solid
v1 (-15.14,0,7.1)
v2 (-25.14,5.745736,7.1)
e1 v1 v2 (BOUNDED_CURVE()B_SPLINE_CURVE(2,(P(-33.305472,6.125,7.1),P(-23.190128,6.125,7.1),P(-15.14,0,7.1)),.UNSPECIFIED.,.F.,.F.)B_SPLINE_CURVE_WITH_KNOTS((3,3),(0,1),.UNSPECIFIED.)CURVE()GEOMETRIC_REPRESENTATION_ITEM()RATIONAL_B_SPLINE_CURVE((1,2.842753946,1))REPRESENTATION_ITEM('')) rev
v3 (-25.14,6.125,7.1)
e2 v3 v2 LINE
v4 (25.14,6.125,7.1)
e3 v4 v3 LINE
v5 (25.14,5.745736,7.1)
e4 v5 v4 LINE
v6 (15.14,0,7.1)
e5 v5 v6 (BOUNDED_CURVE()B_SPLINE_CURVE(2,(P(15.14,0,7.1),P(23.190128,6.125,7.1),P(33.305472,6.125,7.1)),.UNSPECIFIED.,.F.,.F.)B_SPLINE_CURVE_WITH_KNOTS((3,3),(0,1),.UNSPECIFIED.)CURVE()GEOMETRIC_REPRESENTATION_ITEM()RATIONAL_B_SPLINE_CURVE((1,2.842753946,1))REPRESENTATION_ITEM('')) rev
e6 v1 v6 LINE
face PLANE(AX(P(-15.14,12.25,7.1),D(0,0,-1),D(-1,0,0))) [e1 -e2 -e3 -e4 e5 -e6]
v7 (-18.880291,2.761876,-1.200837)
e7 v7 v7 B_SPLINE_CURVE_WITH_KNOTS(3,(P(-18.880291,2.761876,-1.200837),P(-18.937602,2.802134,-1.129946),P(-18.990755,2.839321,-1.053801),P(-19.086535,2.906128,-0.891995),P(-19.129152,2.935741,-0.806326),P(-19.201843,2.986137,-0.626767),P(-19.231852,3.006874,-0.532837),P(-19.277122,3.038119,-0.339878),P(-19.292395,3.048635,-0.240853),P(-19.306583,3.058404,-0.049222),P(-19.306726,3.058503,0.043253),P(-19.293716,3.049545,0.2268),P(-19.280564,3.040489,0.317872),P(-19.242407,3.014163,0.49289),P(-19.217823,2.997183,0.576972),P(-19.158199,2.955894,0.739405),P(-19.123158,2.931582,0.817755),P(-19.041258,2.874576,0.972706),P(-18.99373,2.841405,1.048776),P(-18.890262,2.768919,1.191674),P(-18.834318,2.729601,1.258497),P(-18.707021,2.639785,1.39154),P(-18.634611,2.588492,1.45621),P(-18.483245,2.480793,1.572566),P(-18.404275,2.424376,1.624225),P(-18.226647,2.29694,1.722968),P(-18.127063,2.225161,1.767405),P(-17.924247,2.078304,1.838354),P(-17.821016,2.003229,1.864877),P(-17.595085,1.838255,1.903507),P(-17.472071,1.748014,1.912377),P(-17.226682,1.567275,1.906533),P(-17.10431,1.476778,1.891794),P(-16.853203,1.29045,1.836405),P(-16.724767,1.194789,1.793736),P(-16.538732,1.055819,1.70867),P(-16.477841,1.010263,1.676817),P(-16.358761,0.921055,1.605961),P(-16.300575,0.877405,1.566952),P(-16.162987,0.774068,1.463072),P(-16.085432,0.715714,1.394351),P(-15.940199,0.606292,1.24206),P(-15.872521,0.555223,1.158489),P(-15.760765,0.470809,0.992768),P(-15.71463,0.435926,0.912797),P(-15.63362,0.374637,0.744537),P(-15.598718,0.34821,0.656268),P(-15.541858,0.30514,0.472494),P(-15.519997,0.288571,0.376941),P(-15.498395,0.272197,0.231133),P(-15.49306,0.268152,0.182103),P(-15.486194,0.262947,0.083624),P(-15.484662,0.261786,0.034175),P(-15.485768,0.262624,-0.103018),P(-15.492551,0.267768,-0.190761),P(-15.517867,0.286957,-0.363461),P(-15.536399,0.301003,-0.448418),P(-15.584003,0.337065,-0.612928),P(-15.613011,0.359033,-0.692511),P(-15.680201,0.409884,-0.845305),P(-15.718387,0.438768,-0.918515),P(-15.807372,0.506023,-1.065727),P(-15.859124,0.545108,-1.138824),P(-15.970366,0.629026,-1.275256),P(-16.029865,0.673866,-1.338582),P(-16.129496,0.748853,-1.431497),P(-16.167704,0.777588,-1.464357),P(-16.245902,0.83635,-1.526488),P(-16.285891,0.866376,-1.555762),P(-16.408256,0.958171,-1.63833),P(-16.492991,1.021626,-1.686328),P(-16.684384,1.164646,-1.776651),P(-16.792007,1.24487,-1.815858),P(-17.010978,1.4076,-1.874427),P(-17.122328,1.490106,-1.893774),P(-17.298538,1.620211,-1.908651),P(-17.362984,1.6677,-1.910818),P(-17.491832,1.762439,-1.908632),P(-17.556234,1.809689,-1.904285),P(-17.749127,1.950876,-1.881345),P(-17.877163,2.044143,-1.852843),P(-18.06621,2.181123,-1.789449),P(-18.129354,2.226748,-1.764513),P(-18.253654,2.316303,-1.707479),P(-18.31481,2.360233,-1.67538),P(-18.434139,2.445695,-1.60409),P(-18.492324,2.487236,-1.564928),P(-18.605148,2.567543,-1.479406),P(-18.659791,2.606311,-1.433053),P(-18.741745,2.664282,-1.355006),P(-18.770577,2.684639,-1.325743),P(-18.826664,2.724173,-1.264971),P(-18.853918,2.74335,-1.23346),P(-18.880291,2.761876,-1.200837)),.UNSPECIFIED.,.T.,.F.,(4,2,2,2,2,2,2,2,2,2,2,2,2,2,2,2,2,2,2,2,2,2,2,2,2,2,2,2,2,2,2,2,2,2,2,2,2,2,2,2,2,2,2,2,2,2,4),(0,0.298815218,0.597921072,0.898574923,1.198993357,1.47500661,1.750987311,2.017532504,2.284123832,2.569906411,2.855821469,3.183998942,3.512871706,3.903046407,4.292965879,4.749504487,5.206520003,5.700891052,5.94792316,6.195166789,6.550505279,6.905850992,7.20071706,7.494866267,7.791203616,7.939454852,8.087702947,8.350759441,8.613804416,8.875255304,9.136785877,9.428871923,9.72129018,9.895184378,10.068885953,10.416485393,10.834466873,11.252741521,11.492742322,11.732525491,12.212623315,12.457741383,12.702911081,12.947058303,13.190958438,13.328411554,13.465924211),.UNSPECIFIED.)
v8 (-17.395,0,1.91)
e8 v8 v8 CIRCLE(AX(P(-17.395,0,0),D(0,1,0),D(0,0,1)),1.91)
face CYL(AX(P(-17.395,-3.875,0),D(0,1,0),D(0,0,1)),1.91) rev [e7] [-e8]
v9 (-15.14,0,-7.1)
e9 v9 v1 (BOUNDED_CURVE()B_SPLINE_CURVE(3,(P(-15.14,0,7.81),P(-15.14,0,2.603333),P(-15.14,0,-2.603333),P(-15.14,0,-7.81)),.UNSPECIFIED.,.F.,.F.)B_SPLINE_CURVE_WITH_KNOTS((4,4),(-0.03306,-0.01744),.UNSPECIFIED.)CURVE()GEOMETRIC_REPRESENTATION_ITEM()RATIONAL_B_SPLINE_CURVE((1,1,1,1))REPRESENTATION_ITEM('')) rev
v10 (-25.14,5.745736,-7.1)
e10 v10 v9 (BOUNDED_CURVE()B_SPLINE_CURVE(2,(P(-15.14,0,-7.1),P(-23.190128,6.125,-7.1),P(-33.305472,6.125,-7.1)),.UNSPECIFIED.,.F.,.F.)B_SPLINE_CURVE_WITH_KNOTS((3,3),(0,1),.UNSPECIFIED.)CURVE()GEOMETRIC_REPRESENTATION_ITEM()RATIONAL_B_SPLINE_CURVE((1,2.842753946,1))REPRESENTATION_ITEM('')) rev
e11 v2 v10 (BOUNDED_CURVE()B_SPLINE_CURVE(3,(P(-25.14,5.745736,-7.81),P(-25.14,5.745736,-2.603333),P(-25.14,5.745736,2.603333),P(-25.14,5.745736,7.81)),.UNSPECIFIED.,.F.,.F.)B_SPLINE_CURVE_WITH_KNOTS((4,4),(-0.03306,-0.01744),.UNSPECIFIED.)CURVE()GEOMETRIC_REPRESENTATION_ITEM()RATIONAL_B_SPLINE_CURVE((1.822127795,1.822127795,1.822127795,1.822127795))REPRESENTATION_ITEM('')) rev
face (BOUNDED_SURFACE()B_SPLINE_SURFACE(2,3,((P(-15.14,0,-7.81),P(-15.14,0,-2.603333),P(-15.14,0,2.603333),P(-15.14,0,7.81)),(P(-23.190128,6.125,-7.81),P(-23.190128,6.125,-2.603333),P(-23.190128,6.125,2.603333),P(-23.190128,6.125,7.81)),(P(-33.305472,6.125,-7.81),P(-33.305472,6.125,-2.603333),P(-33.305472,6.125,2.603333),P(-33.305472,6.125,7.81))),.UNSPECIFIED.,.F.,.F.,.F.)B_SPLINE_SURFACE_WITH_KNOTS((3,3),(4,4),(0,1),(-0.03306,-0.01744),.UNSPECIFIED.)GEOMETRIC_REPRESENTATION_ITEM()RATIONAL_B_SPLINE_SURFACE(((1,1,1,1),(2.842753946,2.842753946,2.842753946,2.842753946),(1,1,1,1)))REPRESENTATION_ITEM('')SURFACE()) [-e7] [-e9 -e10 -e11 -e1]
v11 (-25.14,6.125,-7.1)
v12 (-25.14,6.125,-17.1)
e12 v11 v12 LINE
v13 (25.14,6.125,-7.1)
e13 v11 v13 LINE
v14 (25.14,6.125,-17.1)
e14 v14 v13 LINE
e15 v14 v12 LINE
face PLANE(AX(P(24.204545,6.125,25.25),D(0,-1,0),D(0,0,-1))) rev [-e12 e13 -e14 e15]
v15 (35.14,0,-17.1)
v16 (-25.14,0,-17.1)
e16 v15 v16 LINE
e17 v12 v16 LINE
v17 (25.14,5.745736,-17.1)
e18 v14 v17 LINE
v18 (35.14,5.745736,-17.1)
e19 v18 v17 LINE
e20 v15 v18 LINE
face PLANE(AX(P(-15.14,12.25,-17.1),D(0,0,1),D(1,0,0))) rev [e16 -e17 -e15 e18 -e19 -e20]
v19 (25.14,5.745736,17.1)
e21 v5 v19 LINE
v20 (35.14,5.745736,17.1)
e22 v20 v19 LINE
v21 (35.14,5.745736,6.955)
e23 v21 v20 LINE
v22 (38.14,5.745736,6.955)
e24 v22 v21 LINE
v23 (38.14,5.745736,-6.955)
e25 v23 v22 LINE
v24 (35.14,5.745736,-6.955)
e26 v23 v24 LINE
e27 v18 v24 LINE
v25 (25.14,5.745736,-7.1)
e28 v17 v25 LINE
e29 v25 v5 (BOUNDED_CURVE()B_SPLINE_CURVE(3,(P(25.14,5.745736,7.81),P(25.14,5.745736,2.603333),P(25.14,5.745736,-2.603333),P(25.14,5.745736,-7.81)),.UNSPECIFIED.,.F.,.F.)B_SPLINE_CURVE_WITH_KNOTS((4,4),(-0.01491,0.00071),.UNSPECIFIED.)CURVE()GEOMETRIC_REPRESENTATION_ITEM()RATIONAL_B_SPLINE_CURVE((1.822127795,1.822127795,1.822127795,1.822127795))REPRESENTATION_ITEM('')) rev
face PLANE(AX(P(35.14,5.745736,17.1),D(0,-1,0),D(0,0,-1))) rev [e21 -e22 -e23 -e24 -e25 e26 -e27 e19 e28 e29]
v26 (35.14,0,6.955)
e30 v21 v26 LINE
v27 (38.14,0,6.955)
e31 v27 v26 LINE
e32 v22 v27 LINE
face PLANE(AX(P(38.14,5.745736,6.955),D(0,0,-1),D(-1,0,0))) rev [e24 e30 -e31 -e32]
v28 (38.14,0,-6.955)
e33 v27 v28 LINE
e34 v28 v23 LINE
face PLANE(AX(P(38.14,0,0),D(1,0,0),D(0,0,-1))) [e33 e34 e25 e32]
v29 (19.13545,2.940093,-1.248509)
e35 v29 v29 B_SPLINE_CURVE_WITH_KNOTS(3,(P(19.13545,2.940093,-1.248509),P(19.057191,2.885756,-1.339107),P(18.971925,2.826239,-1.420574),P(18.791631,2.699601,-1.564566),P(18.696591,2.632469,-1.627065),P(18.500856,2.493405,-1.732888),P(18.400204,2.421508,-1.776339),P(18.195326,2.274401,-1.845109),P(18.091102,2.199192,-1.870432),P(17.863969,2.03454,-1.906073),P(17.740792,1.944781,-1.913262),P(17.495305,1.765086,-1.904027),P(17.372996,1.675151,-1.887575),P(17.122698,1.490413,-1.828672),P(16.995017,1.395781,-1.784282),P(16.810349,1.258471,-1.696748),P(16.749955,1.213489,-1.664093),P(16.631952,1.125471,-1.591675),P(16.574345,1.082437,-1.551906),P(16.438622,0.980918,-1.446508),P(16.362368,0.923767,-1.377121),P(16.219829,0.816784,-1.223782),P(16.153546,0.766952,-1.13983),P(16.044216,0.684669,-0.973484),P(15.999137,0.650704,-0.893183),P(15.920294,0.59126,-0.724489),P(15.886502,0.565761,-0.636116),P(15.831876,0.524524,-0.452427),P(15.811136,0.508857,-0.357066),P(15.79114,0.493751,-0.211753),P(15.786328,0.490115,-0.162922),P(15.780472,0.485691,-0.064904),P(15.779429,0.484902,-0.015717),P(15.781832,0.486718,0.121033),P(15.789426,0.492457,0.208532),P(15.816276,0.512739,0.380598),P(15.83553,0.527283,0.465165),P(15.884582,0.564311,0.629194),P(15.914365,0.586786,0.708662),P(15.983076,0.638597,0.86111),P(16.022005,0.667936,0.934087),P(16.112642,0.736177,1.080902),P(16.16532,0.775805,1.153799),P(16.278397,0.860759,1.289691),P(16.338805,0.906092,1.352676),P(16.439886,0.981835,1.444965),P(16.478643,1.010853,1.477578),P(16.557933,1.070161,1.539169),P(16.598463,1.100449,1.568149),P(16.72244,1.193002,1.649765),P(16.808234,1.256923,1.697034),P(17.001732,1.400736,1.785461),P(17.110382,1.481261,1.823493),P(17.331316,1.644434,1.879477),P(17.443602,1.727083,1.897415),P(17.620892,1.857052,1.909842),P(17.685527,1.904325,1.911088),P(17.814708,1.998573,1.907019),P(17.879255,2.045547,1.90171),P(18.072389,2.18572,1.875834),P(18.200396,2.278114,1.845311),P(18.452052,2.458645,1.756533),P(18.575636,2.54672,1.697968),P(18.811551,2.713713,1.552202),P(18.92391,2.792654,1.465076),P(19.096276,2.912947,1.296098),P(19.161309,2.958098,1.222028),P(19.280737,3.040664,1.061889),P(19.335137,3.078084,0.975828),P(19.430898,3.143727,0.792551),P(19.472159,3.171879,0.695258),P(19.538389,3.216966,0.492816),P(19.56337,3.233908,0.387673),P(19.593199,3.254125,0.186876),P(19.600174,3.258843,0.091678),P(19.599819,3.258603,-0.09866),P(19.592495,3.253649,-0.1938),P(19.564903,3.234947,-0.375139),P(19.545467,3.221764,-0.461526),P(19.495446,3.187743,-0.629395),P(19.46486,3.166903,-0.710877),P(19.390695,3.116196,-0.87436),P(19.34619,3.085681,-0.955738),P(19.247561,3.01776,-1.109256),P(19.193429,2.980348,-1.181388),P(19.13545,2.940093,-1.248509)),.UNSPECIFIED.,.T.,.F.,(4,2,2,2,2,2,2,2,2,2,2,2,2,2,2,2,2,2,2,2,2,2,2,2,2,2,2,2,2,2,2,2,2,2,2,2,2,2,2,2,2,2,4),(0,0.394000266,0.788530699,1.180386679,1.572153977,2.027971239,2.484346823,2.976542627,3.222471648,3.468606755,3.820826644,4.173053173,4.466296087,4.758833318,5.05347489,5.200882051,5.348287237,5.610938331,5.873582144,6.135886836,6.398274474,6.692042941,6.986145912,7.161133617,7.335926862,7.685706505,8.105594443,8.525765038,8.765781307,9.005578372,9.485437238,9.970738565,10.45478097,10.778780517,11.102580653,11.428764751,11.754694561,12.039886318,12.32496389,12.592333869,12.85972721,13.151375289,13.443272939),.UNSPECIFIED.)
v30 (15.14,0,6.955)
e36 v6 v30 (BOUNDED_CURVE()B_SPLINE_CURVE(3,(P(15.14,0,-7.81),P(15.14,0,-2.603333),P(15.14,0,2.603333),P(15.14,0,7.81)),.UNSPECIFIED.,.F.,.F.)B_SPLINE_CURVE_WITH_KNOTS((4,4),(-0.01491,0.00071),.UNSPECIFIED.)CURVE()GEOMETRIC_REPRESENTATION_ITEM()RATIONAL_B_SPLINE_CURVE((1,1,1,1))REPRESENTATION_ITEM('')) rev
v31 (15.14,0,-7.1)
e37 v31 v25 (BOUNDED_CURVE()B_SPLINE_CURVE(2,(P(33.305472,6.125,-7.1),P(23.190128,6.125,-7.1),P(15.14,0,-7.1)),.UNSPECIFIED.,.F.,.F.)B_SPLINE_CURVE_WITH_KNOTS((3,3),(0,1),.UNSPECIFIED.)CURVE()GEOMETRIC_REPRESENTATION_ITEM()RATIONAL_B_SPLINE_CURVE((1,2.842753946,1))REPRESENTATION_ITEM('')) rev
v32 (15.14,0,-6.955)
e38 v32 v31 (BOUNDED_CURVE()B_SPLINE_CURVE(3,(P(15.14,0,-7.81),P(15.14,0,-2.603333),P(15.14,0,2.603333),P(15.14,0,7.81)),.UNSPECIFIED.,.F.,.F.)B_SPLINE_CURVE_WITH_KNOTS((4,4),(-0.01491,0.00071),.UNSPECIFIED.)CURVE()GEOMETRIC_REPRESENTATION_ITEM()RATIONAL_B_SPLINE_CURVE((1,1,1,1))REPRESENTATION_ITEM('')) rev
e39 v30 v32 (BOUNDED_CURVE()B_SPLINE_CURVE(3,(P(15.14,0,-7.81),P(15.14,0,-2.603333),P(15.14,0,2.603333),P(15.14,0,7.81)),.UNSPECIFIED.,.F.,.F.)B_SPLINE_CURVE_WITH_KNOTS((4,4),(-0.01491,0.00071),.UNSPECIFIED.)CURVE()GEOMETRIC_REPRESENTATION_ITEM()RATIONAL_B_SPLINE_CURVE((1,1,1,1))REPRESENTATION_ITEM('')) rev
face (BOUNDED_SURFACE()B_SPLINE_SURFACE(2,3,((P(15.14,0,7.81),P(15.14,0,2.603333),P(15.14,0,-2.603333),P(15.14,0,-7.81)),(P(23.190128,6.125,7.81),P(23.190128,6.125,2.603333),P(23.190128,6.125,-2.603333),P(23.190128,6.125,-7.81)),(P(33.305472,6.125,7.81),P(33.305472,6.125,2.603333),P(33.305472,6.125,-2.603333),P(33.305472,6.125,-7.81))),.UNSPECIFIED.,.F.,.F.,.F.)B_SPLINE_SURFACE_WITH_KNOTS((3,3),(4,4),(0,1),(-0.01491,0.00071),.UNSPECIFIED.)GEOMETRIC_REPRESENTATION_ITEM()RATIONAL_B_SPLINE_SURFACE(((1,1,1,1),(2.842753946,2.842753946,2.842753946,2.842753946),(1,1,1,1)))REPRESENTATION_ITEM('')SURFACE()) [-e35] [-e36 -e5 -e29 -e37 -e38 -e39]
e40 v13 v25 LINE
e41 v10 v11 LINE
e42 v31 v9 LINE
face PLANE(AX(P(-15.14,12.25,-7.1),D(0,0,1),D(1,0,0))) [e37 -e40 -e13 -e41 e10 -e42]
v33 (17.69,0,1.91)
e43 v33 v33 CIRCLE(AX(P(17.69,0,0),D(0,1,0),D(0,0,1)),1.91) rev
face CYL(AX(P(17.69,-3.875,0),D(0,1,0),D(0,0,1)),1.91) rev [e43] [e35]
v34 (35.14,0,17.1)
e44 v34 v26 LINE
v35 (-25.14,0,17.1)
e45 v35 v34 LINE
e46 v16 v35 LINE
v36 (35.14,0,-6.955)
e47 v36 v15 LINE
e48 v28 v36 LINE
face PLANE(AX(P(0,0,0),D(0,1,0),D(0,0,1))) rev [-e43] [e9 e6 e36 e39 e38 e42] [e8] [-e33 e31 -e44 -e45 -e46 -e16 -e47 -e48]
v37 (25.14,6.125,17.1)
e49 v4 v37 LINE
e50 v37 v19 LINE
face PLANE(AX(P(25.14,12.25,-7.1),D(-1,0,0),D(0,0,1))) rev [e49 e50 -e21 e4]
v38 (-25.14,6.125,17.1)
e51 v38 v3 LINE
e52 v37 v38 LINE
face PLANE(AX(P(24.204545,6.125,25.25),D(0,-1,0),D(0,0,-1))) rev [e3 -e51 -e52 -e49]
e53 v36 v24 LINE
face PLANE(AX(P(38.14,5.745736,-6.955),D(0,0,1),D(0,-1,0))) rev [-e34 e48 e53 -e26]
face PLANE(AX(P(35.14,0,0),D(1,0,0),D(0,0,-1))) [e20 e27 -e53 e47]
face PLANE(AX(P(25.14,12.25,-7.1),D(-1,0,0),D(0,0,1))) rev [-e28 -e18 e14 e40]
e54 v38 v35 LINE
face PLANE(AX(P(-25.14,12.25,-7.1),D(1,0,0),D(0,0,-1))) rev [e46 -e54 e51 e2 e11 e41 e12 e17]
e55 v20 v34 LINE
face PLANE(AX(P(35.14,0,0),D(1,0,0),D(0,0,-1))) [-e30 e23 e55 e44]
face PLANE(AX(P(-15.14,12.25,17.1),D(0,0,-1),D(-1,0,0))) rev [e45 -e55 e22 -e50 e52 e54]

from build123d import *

# Parameters (mm, degrees)
SKETCH_1_W                = 50.28
SKETCH_1_H                = 34.2
SKETCH_1_W_2              = 30.28
SKETCH_1_H_2              = 14.2
EXTRUDE_1_DEPTH           = 12.25
SKETCH_4_W                = 13
SKETCH_4_H                = 13.91
EXTRUDE_1_2_DEPTH         = 74.82
SKETCH_5_W                = 13.91
SKETCH_5_H                = 16.23
EXTRUDE_2_DEPTH           = 16
SKETCH_7_R                = 25.25
SKETCH_7_R_2              = 15.25
EXTRUDE_2_2_DEPTH         = 16.23
SKETCH_15_R               = 1.91
CUT_EXTRUDE_6_DEPTH       = 97.964478439
SKETCH_16_W               = 13.91
SKETCH_16_H               = 16.23
EXTRUDE_4_DEPTH           = 10
SKETCH_17_R               = 1.91
CUT_EXTRUDE_7_DEPTH       = 102.16913771
SKETCH_18_W               = 49.344544624
SKETCH_18_H               = 6.125
CUT_EXTRUDE_8_DEPTH       = 105.840616652
SKETCH_19_W               = 34.2
SKETCH_19_H               = 6.125
CUT_EXTRUDE_9_DEPTH       = 10
SKETCH_21_R               = 1.91
CUT_EXTRUDE_10_DEPTH      = 10
SKETCH_20_R               = 1.91
CUT_EXTRUDE_11_DEPTH      = 10
FILLET_START              = -7.1
FILLET_1_DEPTH            = 14.2
FILLET_2_DEPTH            = 14.2
SKETCH_29_W               = 13.91
SKETCH_29_H               = 74.82
EXTRUDE_5_DEPTH           = 10
SKETCH_30_W               = 10
SKETCH_30_H               = 58.59
CUT_EXTRUDE_13_DEPTH      = 102.16913771
SKETCH_32_W               = 34.2
SKETCH_32_H               = 5.745736365
EXTRUDE_6_DEPTH           = 10
CUT_EXTRUDE_16_DEPTH      = 50
CUT_EXTRUDE_16_DEPTH_BACK = 50
SKETCH_38_W               = 116.985630298
SKETCH_38_H               = 80.538350638
SKETCH_41_W               = 13.91
SKETCH_41_H               = 5.745736365
EXTRUDE_7_DEPTH           = 3


with BuildPart() as part:
    # 草圖1 → Extrude 1 (new body)
    with BuildSketch(Plane(origin=(0, 0, 0), x_dir=(1, 0, 0), z_dir=(0, 1, 0))):
        Rectangle(SKETCH_1_W, SKETCH_1_H)
        Rectangle(SKETCH_1_W_2, SKETCH_1_H_2, mode=Mode.SUBTRACT)
    extrude(amount=EXTRUDE_1_DEPTH)

    # 草圖4 → Extrude 1 2 (add)
    with BuildSketch(Plane.XZ):
        with Locations((18.64, 0)):
            Rectangle(SKETCH_4_W, SKETCH_4_H)
    extrude(amount=EXTRUDE_1_2_DEPTH)

    # 草圖5 → Extrude 2 (add)
    with BuildSketch(Plane.ZY.offset(-12.14)):
        with Locations((0, -66.705)):
            Rectangle(SKETCH_5_W, SKETCH_5_H)
    extrude(amount=EXTRUDE_2_DEPTH)

    # 草圖7 → Extrude 2 2 (add)
    with BuildSketch(Plane(origin=(3.626674765, -74.82, 0), x_dir=(1, 0, 0), z_dir=(0, -1, 0))):
        with Locations((-30.978154344, 0)):
            Circle(SKETCH_7_R)
        with Locations((-30.978154344, 0)):
            Circle(SKETCH_7_R_2, mode=Mode.SUBTRACT)
    extrude(amount=-EXTRUDE_2_2_DEPTH)

    # 草圖15 → 除料-伸長6 (cut, through all)
    with BuildSketch(Plane(origin=(0, 0, -6.955), x_dir=(-1, 0, 0), z_dir=(0, 0, -1))):
        with Locations((-4.530883248, -66.705)):
            Circle(SKETCH_15_R)
    extrude(amount=-CUT_EXTRUDE_6_DEPTH, mode=Mode.SUBTRACT)

    # 草圖16 → 填料-伸長4 (add)
    with BuildSketch(Plane(origin=(-60, 0, 0), x_dir=(0, 0, -1), z_dir=(1, 0, 0))):
        with Locations((0, -66.705)):
            Rectangle(SKETCH_16_W, SKETCH_16_H)
    extrude(amount=EXTRUDE_4_DEPTH)

    # 草圖17 → 除料-伸長7 (cut, through all)
    with BuildSketch(Plane(origin=(0, 0, -6.955), x_dir=(-1, 0, 0), z_dir=(0, 0, -1))):
        with Locations((55.812362827, -66.705)):
            Circle(SKETCH_17_R)
    extrude(amount=-CUT_EXTRUDE_7_DEPTH, mode=Mode.SUBTRACT)

    # 草圖18 → 除料-伸長8 (cut, through all)
    with BuildSketch(Plane(origin=(0, 0, -17.1), x_dir=(-1, 0, 0), z_dir=(0, 0, -1))):
        with Locations((0.467727688, 9.1875)):
            Rectangle(SKETCH_18_W, SKETCH_18_H)
    extrude(amount=-CUT_EXTRUDE_8_DEPTH, mode=Mode.SUBTRACT)

    # 草圖19 → 除料-伸長9 (cut)
    with BuildSketch(Plane.ZY.offset(-24.204544624)):
        with Locations((0, 9.1875)):
            Rectangle(SKETCH_19_W, SKETCH_19_H)
    extrude(amount=-CUT_EXTRUDE_9_DEPTH, mode=Mode.SUBTRACT)

    # 草圖21 → 除料-伸長10 (cut)
    with BuildSketch(Plane(origin=(0, 6.125, 0), x_dir=(1, 0, 0), z_dir=(0, 1, 0))):
        with Locations(Location((17.69, 0, 0), (0, 0, 270))):
            Circle(SKETCH_21_R)
    extrude(amount=-CUT_EXTRUDE_10_DEPTH, mode=Mode.SUBTRACT)

    # 草圖20 → 除料-伸長11 (cut)
    with BuildSketch(Plane(origin=(0, 6.125, 0), x_dir=(1, 0, 0), z_dir=(0, 1, 0))):
        with Locations(Location((-17.395, 0, 0), (0, 0, 270))):
            Circle(SKETCH_20_R)
    extrude(amount=-CUT_EXTRUDE_11_DEPTH, mode=Mode.SUBTRACT)

    # 圓角1: read off the stored shape, not the designer's step
    # 圓角1 outline → 圓角1 (cut)
    with BuildSketch(Plane.XY.offset(FILLET_START)):
        with BuildLine():
            add(Edge.make_bspline(
                [(-15.14, 0), (-21.974170252, 5.199829476), (-25.14, 5.745736365)],
                knots=[0, 0, 0, 0.664102345, 0.664102345, 0.664102345], degree=2, weights=[1, 2.223777218, 1.822127795]))
            Line((-15.14, 0), (-15.14, 6.125))
            Line((-15.14, 6.125), (-25.14, 6.125))
            Line((-25.14, 6.125), (-25.14, 5.745736365))
        make_face()
    extrude(amount=FILLET_1_DEPTH, mode=Mode.SUBTRACT)

    # 圓角2: read off the stored shape, not the designer's step
    # 圓角2 outline → 圓角2 (cut)
    with BuildSketch(Plane.XY.offset(FILLET_START)):
        with BuildLine():
            Line((15.14, 6.125), (15.14, 0))
            add(Edge.make_bspline(
                [(15.14, 0), (21.974170252, 5.199829476), (25.14, 5.745736365)],
                knots=[0, 0, 0, 0.664102345, 0.664102345, 0.664102345], degree=2, weights=[1, 2.223777218, 1.822127795]))
            Line((25.14, 5.745736365), (25.14, 6.125))
            Line((25.14, 6.125), (15.14, 6.125))
        make_face()
    extrude(amount=FILLET_2_DEPTH, mode=Mode.SUBTRACT)

    # 草圖29 → 填料-伸長5 (add)
    with BuildSketch(Plane(origin=(25.14, 0, 0), x_dir=(0, 0, -1), z_dir=(1, 0, 0))):
        with Locations((0, -37.41)):
            Rectangle(SKETCH_29_W, SKETCH_29_H)
    extrude(amount=EXTRUDE_5_DEPTH)

    # 草圖30 → 除料-伸長13 (cut, through all)
    with BuildSketch(Plane.XY.offset(6.955)):
        with Locations((17.14, -29.295)):
            Rectangle(SKETCH_30_W, SKETCH_30_H)
    extrude(amount=-CUT_EXTRUDE_13_DEPTH, mode=Mode.SUBTRACT)

    # 草圖32 → 填料-伸長6 (add)
    with BuildSketch(Plane(origin=(25.14, 0, 0), x_dir=(0, 0, -1), z_dir=(1, 0, 0))):
        with Locations((0, 2.872868182)):
            Rectangle(SKETCH_32_W, SKETCH_32_H)
    extrude(amount=EXTRUDE_6_DEPTH)

    # 草圖38 → 除料-伸長16 (cut, two sides: drawn at the far end of the back side and taken through both)
    with BuildSketch(Plane(origin=(0, 0, -6.955), x_dir=(-1, 0, 0), z_dir=(0, 0, -1)).offset(-CUT_EXTRUDE_16_DEPTH_BACK)):
        with Locations((7.268869252, -40.269175319)):
            Rectangle(SKETCH_38_W, SKETCH_38_H)
    extrude(amount=CUT_EXTRUDE_16_DEPTH + CUT_EXTRUDE_16_DEPTH_BACK, mode=Mode.SUBTRACT)

    # 草圖41 → 填料-伸長7 (add)
    with BuildSketch(Plane(origin=(35.14, 0, 0), x_dir=(0, 0, -1), z_dir=(1, 0, 0))):
        with Locations((0, 2.872868182)):
            Rectangle(SKETCH_41_W, SKETCH_41_H)
    extrude(amount=EXTRUDE_7_DEPTH)


solid = part.part
